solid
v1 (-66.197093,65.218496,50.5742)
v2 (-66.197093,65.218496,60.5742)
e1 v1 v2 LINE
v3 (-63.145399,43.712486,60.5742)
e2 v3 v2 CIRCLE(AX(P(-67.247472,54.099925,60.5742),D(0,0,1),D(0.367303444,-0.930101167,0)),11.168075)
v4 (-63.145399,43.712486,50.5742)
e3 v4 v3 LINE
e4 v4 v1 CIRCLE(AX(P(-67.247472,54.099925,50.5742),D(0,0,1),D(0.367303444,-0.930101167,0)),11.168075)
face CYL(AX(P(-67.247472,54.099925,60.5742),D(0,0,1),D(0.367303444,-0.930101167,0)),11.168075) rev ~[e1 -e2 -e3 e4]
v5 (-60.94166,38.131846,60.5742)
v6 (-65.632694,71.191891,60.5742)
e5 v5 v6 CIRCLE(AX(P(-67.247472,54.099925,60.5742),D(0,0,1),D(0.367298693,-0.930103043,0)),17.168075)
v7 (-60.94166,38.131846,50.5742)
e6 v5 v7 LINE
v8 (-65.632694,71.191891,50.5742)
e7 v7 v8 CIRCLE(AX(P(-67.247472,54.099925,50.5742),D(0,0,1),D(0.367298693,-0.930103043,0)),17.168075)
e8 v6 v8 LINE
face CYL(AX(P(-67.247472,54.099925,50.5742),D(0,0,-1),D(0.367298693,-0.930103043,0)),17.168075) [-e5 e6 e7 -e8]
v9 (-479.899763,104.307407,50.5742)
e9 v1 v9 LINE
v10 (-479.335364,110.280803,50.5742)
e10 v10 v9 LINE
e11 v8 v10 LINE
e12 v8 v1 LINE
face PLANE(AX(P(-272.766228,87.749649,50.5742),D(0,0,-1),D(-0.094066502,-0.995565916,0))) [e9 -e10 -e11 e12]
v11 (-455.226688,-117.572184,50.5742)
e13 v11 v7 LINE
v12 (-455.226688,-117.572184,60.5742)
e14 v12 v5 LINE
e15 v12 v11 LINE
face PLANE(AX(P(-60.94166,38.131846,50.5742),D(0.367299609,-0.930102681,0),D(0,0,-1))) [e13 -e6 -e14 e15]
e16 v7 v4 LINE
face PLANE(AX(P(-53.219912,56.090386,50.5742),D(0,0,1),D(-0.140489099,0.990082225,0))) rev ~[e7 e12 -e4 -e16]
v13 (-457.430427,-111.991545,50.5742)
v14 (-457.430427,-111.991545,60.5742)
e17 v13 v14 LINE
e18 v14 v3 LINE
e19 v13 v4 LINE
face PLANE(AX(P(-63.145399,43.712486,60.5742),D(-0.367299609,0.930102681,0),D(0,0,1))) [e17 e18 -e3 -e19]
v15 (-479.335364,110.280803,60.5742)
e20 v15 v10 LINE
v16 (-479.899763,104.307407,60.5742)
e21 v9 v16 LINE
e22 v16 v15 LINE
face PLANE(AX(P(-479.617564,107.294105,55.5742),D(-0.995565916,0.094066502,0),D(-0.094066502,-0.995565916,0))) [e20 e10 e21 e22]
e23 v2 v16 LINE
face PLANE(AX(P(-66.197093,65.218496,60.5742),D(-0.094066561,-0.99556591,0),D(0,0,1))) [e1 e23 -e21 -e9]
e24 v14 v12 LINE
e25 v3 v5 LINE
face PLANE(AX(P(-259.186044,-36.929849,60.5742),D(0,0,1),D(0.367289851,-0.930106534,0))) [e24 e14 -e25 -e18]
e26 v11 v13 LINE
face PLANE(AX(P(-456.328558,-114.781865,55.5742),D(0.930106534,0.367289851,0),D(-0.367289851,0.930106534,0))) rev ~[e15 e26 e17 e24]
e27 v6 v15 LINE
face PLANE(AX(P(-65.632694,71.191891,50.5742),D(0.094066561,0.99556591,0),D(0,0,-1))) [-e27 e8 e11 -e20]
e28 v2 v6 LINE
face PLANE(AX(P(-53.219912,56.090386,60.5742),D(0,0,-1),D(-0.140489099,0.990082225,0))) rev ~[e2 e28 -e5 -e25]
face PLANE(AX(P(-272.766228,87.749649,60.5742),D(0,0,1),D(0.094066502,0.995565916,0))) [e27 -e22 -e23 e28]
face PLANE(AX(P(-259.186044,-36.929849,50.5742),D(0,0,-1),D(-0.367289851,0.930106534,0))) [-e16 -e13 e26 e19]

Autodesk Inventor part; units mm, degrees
ref_plane "YZ Plane" through (0, 0, 0) normal (1, 0, 0) x (0, 1, 0)
ref_plane "XZ Plane" through (0, 0, 0) normal (0, 1, 0) x (-1, 0, 0)
ref_plane "XY Plane" through (0, 0, 0) normal (0, 0, 1) x (1, 0, 0)
ref_plane "Work Plane1" through (-50.9507, 50.6889, 57.5) normal (0, 0, 1) x (-0.2048689, -0.9787894, 0)
sketch "Sketch1" plane through (-50.9507, 50.6889, 57.5) normal (0, 0, 1) x (-0.2048689, -0.9787894, 0)
  arc A0 (13.9049, -7.4915) -> (-16.5454, -18.513) centre (0, -16.65) ccw
  circle A1 centre (79.9079, -408.7425) radius 3.175 projected
  circle A2 centre (121.7651, -356.8432) radius 3.175 projected
  circle A3 centre (187.6397, -367.1429) radius 3.175 projected
  circle A4 centre (211.6572, -429.3419) radius 3.175 projected
  circle A5 centre (169.8001, -481.2412) radius 3.175 projected
  circle A6 centre (103.9254, -470.9415) radius 3.175 projected
  circle A7 centre (66.2341, -383.8137) radius 9.5 projected
  circle A8 centre (136.5171, -332.537) radius 9.5 projected
  circle A9 centre (216.0656, -367.7655) radius 9.5 projected
  circle A10 centre (225.331, -454.2707) radius 9.5 projected
  circle A11 centre (155.048, -505.5474) radius 9.5 projected
  circle A12 centre (75.4996, -470.3189) radius 9.5 projected
  circle A13 centre (59.2774, -428.3076) radius 9.5 projected
  circle A14 centre (110.5541, -498.5906) radius 9.5 projected
  circle A15 centre (197.0593, -489.3252) radius 9.5 projected
  circle A16 centre (232.2878, -409.7768) radius 9.5 projected
  circle A17 centre (181.0111, -339.4938) radius 9.5 projected
  circle A18 centre (94.5059, -348.7592) radius 9.5 projected
  circle A19 centre (145.7826, -419.0422) radius 58 projected
  arc A20 (29.4913, -426.0124) -> (29.2993, -421.0163) centre (29.3729, -423.5152) ccw projected
  arc A21 (29.4913, -426.0124) -> (29.7056, -428.9608) centre (145.7826, -419.0422) ccw projected
  arc A22 (30.238, -433.9322) -> (29.7056, -428.9608) centre (29.9496, -431.4489) ccw projected
  arc A23 (30.238, -433.9322) -> (30.653, -436.8591) centre (145.7826, -419.0422) ccw projected
  arc A24 (31.5235, -441.7825) -> (30.653, -436.8591) centre (31.0663, -439.3247) ccw projected
  arc A25 (31.5235, -441.7825) -> (32.1373, -444.6743) centre (145.7826, -419.0422) ccw projected
  arc A26 (33.3417, -449.5268) -> (32.1373, -444.6743) centre (32.7178, -447.1059) ccw projected
  arc A27 (33.3417, -449.5268) -> (34.1514, -452.3699) centre (145.7826, -419.0422) ccw projected
  arc A28 (35.6842, -457.129) -> (34.1514, -452.3699) centre (34.8965, -454.7563) ccw projected
  arc A29 (35.6842, -457.129) -> (36.686, -459.9102) centre (145.7826, -419.0422) ccw projected
  arc A30 (38.54, -464.5536) -> (36.686, -459.9102) centre (37.5922, -462.2402) ccw projected
  arc A31 (38.54, -464.5536) -> (39.7293, -467.26) centre (145.7826, -419.0422) ccw projected
  arc A32 (41.8958, -471.766) -> (39.7293, -467.26) centre (40.7924, -469.5227) ccw projected
  arc A33 (41.8958, -471.766) -> (43.267, -474.3849) centre (145.7826, -419.0422) ccw projected
  arc A34 (45.736, -478.7325) -> (43.267, -474.3849) centre (44.4821, -476.5698) ccw projected
  arc A35 (45.736, -478.7325) -> (47.2827, -481.2518) centre (145.7826, -419.0422) ccw projected
  arc A36 (50.0427, -485.4208) -> (47.2827, -481.2518) centre (48.644, -483.3486) ccw projected
  arc A37 (50.0427, -485.4208) -> (51.7577, -487.8286) centre (145.7826, -419.0422) ccw projected
  arc A38 (54.7957, -491.7996) -> (51.7577, -487.8286) centre (53.2589, -489.8277) ccw projected
  arc A39 (54.7957, -491.7996) -> (56.671, -494.0847) centre (145.7826, -419.0422) ccw projected
  arc A40 (59.9729, -497.8391) -> (56.671, -494.0847) centre (58.3052, -495.9767) ccw projected
  arc A41 (59.9729, -497.8391) -> (61.9999, -499.991) centre (145.7826, -419.0422) ccw projected
  arc A42 (65.5503, -503.5113) -> (61.9999, -499.991) centre (63.7593, -501.767) ccw projected
  arc A43 (65.5503, -503.5113) -> (67.7193, -505.5198) centre (145.7826, -419.0422) ccw projected
  arc A44 (71.5017, -508.7896) -> (67.7193, -505.5198) centre (69.5959, -507.1716) ccw projected
  arc A45 (71.5017, -508.7896) -> (73.8027, -510.6454) centre (145.7826, -419.0422) ccw projected
  arc A46 (77.7994, -513.6495) -> (73.8027, -510.6454) centre (75.7876, -512.1654) ccw projected
  arc A47 (77.7994, -513.6495) -> (80.2218, -515.344) centre (145.7826, -419.0422) ccw projected
  arc A48 (84.4141, -518.0683) -> (80.2218, -515.344) centre (82.3058, -516.7249) ccw projected
  arc A49 (84.4141, -518.0683) -> (86.9465, -519.5935) centre (145.7826, -419.0422) ccw projected
  arc A50 (91.315, -522.0254) -> (86.9465, -519.5935) centre (89.1198, -520.829) ccw projected
  arc A51 (91.315, -522.0254) -> (93.9455, -523.3742) centre (145.7826, -419.0422) ccw projected
  arc A52 (98.4698, -525.5023) -> (93.9455, -523.3742) centre (96.1981, -524.4585) ccw projected
  arc A53 (98.4698, -525.5023) -> (101.1862, -526.6685) centre (145.7826, -419.0422) ccw projected
  arc A54 (105.8452, -528.4828) -> (101.1862, -526.6685) centre (103.5076, -527.5965) ccw projected
  arc A55 (105.8452, -528.4828) -> (108.6348, -529.4609) centre (145.7826, -419.0422) ccw projected
  arc A56 (113.4068, -530.9531) -> (108.6348, -529.4609) centre (111.0141, -530.2284) ccw projected
  arc A57 (113.4068, -530.9531) -> (116.2567, -531.7386) centre (145.7826, -419.0422) ccw projected
  arc A58 (121.1193, -532.9016) -> (116.2567, -531.7386) centre (118.6828, -532.3419) ccw projected
  arc A59 (121.1193, -532.9016) -> (124.0162, -533.4908) centre (145.7826, -419.0422) ccw projected
  arc A60 (128.9469, -534.3193) -> (124.0162, -533.4908) centre (126.4778, -533.9271) ccw projected
  arc A61 (128.9469, -534.3193) -> (131.8772, -534.7093) centre (145.7826, -419.0422) ccw projected
  arc A62 (136.8529, -535.1995) -> (131.8772, -534.7093) centre (134.3628, -534.9767) ccw projected
  arc A63 (136.8529, -535.1995) -> (139.803, -535.3886) centre (145.7826, -419.0422) ccw projected
  arc A64 (144.8006, -535.5381) -> (139.803, -535.3886) centre (142.3011, -535.4857) ccw projected
  arc A65 (144.8006, -535.5381) -> (147.7567, -535.5255) centre (145.7826, -419.0422) ccw projected
  arc A66 (152.7528, -535.3335) -> (147.7567, -535.5255) centre (150.2556, -535.4518) ccw projected
  arc A67 (152.7528, -535.3335) -> (155.7012, -535.1192) centre (145.7826, -419.0422) ccw projected
  arc A68 (160.6726, -534.5867) -> (155.7012, -535.1192) centre (158.1893, -534.8752) ccw projected
  arc A69 (160.6726, -534.5867) -> (163.5995, -534.1717) centre (145.7826, -419.0422) ccw projected
  arc A70 (168.5229, -533.3012) -> (163.5995, -534.1717) centre (166.0651, -533.7585) ccw projected
  arc A71 (168.5229, -533.3012) -> (171.4146, -532.6875) centre (145.7826, -419.0422) ccw projected
  arc A72 (176.2672, -531.483) -> (171.4146, -532.6875) centre (173.8463, -532.107) ccw projected
  arc A73 (176.2672, -531.483) -> (179.1103, -530.6733) centre (145.7826, -419.0422) ccw projected
  arc A74 (183.8694, -529.1405) -> (179.1103, -530.6733) centre (181.4967, -529.9282) ccw projected
  arc A75 (183.8694, -529.1405) -> (186.6506, -528.1387) centre (145.7826, -419.0422) ccw projected
  arc A76 (191.2939, -526.2847) -> (186.6506, -528.1387) centre (188.9806, -527.2325) ccw projected
  arc A77 (191.2939, -526.2847) -> (194.0003, -525.0955) centre (145.7826, -419.0422) ccw projected
  arc A78 (198.5063, -522.9289) -> (194.0003, -525.0955) centre (196.263, -524.0324) ccw projected
  arc A79 (198.5063, -522.9289) -> (201.1253, -521.5577) centre (145.7826, -419.0422) ccw projected
  arc A80 (205.4729, -519.0888) -> (201.1253, -521.5577) centre (203.3101, -520.3427) ccw projected
  arc A81 (205.4729, -519.0888) -> (207.9921, -517.542) centre (145.7826, -419.0422) ccw projected
  arc A82 (212.1612, -514.7821) -> (207.9921, -517.542) centre (210.089, -516.1807) ccw projected
  arc A83 (212.1612, -514.7821) -> (214.569, -513.0671) centre (145.7826, -419.0422) ccw projected
  arc A84 (218.54, -510.0291) -> (214.569, -513.0671) centre (216.5681, -511.5658) ccw projected
  arc A85 (218.54, -510.0291) -> (220.8251, -508.1537) centre (145.7826, -419.0422) ccw projected
  arc A86 (224.5795, -504.8518) -> (220.8251, -508.1537) centre (222.7171, -506.5196) ccw projected
  arc A87 (224.5795, -504.8518) -> (226.7314, -502.8249) centre (145.7826, -419.0422) ccw projected
  arc A88 (230.2517, -499.2745) -> (226.7314, -502.8249) centre (228.5074, -501.0655) ccw projected
  arc A89 (230.2517, -499.2745) -> (232.2602, -497.1055) centre (145.7826, -419.0422) ccw projected
  arc A90 (235.53, -493.3231) -> (232.2602, -497.1055) centre (233.912, -495.2289) ccw projected
  arc A91 (235.53, -493.3231) -> (237.3858, -491.022) centre (145.7826, -419.0422) ccw projected
  arc A92 (240.3899, -487.0253) -> (237.3858, -491.022) centre (238.9057, -489.0371) ccw projected
  arc A93 (240.3899, -487.0253) -> (242.0843, -484.603) centre (145.7826, -419.0422) ccw projected
  arc A94 (244.8087, -480.4106) -> (242.0843, -484.603) centre (243.4653, -482.519) ccw projected
  arc A95 (244.8087, -480.4106) -> (246.3339, -477.8783) centre (145.7826, -419.0422) ccw projected
  arc A96 (248.7657, -473.5098) -> (246.3339, -477.8783) centre (247.5693, -475.7049) ccw projected
  arc A97 (248.7657, -473.5098) -> (250.1146, -470.8793) centre (145.7826, -419.0422) ccw projected
  arc A98 (252.2427, -466.355) -> (250.1146, -470.8793) centre (251.1989, -468.6266) ccw projected
  arc A99 (252.2427, -466.355) -> (253.4088, -463.6386) centre (145.7826, -419.0422) ccw projected
  arc A100 (255.2232, -458.9796) -> (253.4088, -463.6386) centre (254.3369, -461.3172) ccw projected
  arc A101 (255.2232, -458.9796) -> (256.2013, -456.1899) centre (145.7826, -419.0422) ccw projected
  arc A102 (257.6935, -451.418) -> (256.2013, -456.1899) centre (256.9688, -453.8106) ccw projected
  arc A103 (257.6935, -451.418) -> (258.4789, -448.5681) centre (145.7826, -419.0422) ccw projected
  arc A104 (259.642, -443.7054) -> (258.4789, -448.5681) centre (259.0822, -446.142) ccw projected
  arc A105 (259.642, -443.7054) -> (260.2311, -440.8086) centre (145.7826, -419.0422) ccw projected
  arc A106 (261.0597, -435.8779) -> (260.2311, -440.8086) centre (260.6675, -438.3469) ccw projected
  arc A107 (261.0597, -435.8779) -> (261.4497, -432.9476) centre (145.7826, -419.0422) ccw projected
  arc A108 (261.9398, -427.9719) -> (261.4497, -432.9476) centre (261.717, -430.4619) ccw projected
  arc A109 (261.9398, -427.9719) -> (262.129, -425.0218) centre (145.7826, -419.0422) ccw projected
  arc A110 (262.2784, -420.0242) -> (262.129, -425.0218) centre (262.2261, -422.5236) ccw projected
  arc A111 (262.2784, -420.0242) -> (262.2658, -417.0681) centre (145.7826, -419.0422) ccw projected
  arc A112 (262.0739, -412.0719) -> (262.2658, -417.0681) centre (262.1922, -414.5691) ccw projected
  arc A113 (262.0739, -412.0719) -> (261.8596, -409.1236) centre (145.7826, -419.0422) ccw projected
  arc A114 (261.3271, -404.1522) -> (261.8596, -409.1236) centre (261.6156, -406.6355) ccw projected
  arc A115 (261.3271, -404.1522) -> (260.9121, -401.2253) centre (145.7826, -419.0422) ccw projected
  arc A116 (260.0416, -396.3019) -> (260.9121, -401.2253) centre (260.4989, -398.7597) ccw projected
  arc A117 (260.0416, -396.3019) -> (259.4278, -393.4101) centre (145.7826, -419.0422) ccw projected
  arc A118 (258.2234, -388.5576) -> (259.4278, -393.4101) centre (258.8473, -390.9785) ccw projected
  arc A119 (258.2234, -388.5576) -> (257.4137, -385.7145) centre (145.7826, -419.0422) ccw projected
  arc A120 (255.8809, -380.9554) -> (257.4137, -385.7145) centre (256.6686, -383.3281) ccw projected
  arc A121 (255.8809, -380.9554) -> (254.8791, -378.1742) centre (145.7826, -419.0422) ccw projected
  arc A122 (253.0251, -373.5308) -> (254.8791, -378.1742) centre (253.9729, -375.8442) ccw projected
  arc A123 (253.0251, -373.5308) -> (251.8358, -370.8244) centre (145.7826, -419.0422) ccw projected
  arc A124 (249.6693, -366.3184) -> (251.8358, -370.8244) centre (250.7727, -368.5617) ccw projected
  arc A125 (249.6693, -366.3184) -> (248.2981, -363.6995) centre (145.7826, -419.0422) ccw projected
  arc A126 (245.8291, -359.3519) -> (248.2981, -363.6995) centre (247.0831, -361.5146) ccw projected
  arc A127 (245.8291, -359.3519) -> (244.2824, -356.8326) centre (145.7826, -419.0422) ccw projected
  arc A128 (241.5225, -352.6636) -> (244.2824, -356.8326) centre (242.9211, -354.7358) ccw projected
  arc A129 (241.5225, -352.6636) -> (239.8075, -350.2558) centre (145.7826, -419.0422) ccw projected
  arc A130 (236.7695, -346.2848) -> (239.8075, -350.2558) centre (238.3062, -348.2567) ccw projected
  arc A131 (236.7695, -346.2848) -> (234.8941, -343.9996) centre (145.7826, -419.0422) ccw projected
  arc A132 (231.5922, -340.2453) -> (234.8941, -343.9996) centre (233.26, -342.1077) ccw projected
  arc A133 (231.5922, -340.2453) -> (229.5653, -338.0934) centre (145.7826, -419.0422) ccw projected
  arc A134 (226.0149, -334.5731) -> (229.5653, -338.0934) centre (227.8058, -336.3174) ccw projected
  arc A135 (226.0149, -334.5731) -> (223.8458, -332.5646) centre (145.7826, -419.0422) ccw projected
  arc A136 (220.0635, -329.2948) -> (223.8458, -332.5646) centre (221.9693, -330.9127) ccw projected
  arc A137 (220.0635, -329.2948) -> (217.7624, -327.439) centre (145.7826, -419.0422) ccw projected
  arc A138 (213.7657, -324.4349) -> (217.7624, -327.439) centre (215.7775, -325.919) ccw projected
  arc A139 (213.7657, -324.4349) -> (211.3434, -322.7404) centre (145.7826, -419.0422) ccw projected
  arc A140 (207.151, -320.0161) -> (211.3434, -322.7404) centre (209.2594, -321.3595) ccw projected
  arc A141 (207.151, -320.0161) -> (204.6187, -318.4909) centre (145.7826, -419.0422) ccw projected
  arc A142 (200.2501, -316.059) -> (204.6187, -318.4909) centre (202.4453, -317.2554) ccw projected
  arc A143 (200.2501, -316.059) -> (197.6196, -314.7102) centre (145.7826, -419.0422) ccw projected
  arc A144 (193.0953, -312.5821) -> (197.6196, -314.7102) centre (195.367, -313.6259) ccw projected
  arc A145 (193.0953, -312.5821) -> (190.3789, -311.4159) centre (145.7826, -419.0422) ccw projected
  arc A146 (185.72, -309.6015) -> (190.3789, -311.4159) centre (188.0576, -310.4879) ccw projected
  arc A147 (185.72, -309.6015) -> (182.9303, -308.6235) centre (145.7826, -419.0422) ccw projected
  arc A148 (178.1584, -307.1313) -> (182.9303, -308.6235) centre (180.551, -307.856) ccw projected
  arc A149 (178.1584, -307.1313) -> (175.3085, -306.3458) centre (145.7826, -419.0422) ccw projected
  arc A150 (170.4458, -305.1827) -> (175.3085, -306.3458) centre (172.8823, -305.7425) ccw projected
  arc A151 (170.4458, -305.1827) -> (167.5489, -304.5936) centre (145.7826, -419.0422) ccw projected
  arc A152 (162.6183, -303.7651) -> (167.5489, -304.5936) centre (165.0873, -304.1573) ccw projected
  arc A153 (162.6183, -303.7651) -> (159.688, -303.375) centre (145.7826, -419.0422) ccw projected
  arc A154 (154.7122, -302.8849) -> (159.688, -303.375) centre (157.2023, -303.1077) ccw projected
  arc A155 (154.7122, -302.8849) -> (151.7621, -302.6958) centre (145.7826, -419.0422) ccw projected
  arc A156 (146.7646, -302.5463) -> (151.7621, -302.6958) centre (149.264, -302.5987) ccw projected
  arc A157 (146.7646, -302.5463) -> (143.8084, -302.5589) centre (145.7826, -419.0422) ccw projected
  arc A158 (138.8123, -302.7509) -> (143.8084, -302.5589) centre (141.3095, -302.6326) ccw projected
  arc A159 (138.8123, -302.7509) -> (135.8639, -302.9652) centre (145.7826, -419.0422) ccw projected
  arc A160 (130.8926, -303.4977) -> (135.8639, -302.9652) centre (133.3759, -303.2092) ccw projected
  arc A161 (130.8926, -303.4977) -> (127.9657, -303.9127) centre (145.7826, -419.0422) ccw projected
  arc A162 (123.0422, -304.7832) -> (127.9657, -303.9127) centre (125.5001, -304.3259) ccw projected
  arc A163 (123.0422, -304.7832) -> (120.1505, -305.3969) centre (145.7826, -419.0422) ccw projected
  arc A164 (115.2979, -306.6014) -> (120.1505, -305.3969) centre (117.7188, -305.9774) ccw projected
  arc A165 (115.2979, -306.6014) -> (112.4548, -307.4111) centre (145.7826, -419.0422) ccw projected
  arc A166 (107.6958, -308.9438) -> (112.4548, -307.4111) centre (110.0684, -308.1562) ccw projected
  arc A167 (107.6958, -308.9438) -> (104.9145, -309.9457) centre (145.7826, -419.0422) ccw projected
  arc A168 (100.2712, -311.7996) -> (104.9145, -309.9457) centre (102.5846, -310.8519) ccw projected
  arc A169 (100.2712, -311.7996) -> (97.5648, -312.9889) centre (145.7826, -419.0422) ccw projected
  arc A170 (93.0588, -315.1555) -> (97.5648, -312.9889) centre (95.3021, -314.052) ccw projected
  arc A171 (93.0588, -315.1555) -> (90.4399, -316.5266) centre (145.7826, -419.0422) ccw projected
  arc A172 (86.0922, -318.9956) -> (90.4399, -316.5266) centre (88.255, -317.7417) ccw projected
  arc A173 (86.0922, -318.9956) -> (83.573, -320.5424) centre (145.7826, -419.0422) ccw projected
  arc A174 (79.404, -323.3023) -> (83.573, -320.5424) centre (81.4761, -321.9037) ccw projected
  arc A175 (79.404, -323.3023) -> (76.9961, -325.0173) centre (145.7826, -419.0422) ccw projected
  arc A176 (73.0252, -328.0553) -> (76.9961, -325.0173) centre (74.9971, -326.5185) ccw projected
  arc A177 (73.0252, -328.0553) -> (70.74, -329.9307) centre (145.7826, -419.0422) ccw projected
  arc A178 (66.9856, -333.2326) -> (70.74, -329.9307) centre (68.8481, -331.5648) ccw projected
  arc A179 (66.9856, -333.2326) -> (64.8338, -335.2595) centre (145.7826, -419.0422) ccw projected
  arc A180 (61.3135, -338.8099) -> (64.8338, -335.2595) centre (63.0577, -337.0189) ccw projected
  arc A181 (61.3135, -338.8099) -> (59.305, -340.9789) centre (145.7826, -419.0422) ccw projected
  arc A182 (56.0351, -344.7613) -> (59.305, -340.9789) centre (57.6531, -342.8555) ccw projected
  arc A183 (56.0351, -344.7613) -> (54.1793, -347.0624) centre (145.7826, -419.0422) ccw projected
  arc A184 (51.1753, -351.0591) -> (54.1793, -347.0624) centre (52.6594, -349.0473) ccw projected
  arc A185 (51.1753, -351.0591) -> (49.4808, -353.4814) centre (145.7826, -419.0422) ccw projected
  arc A186 (46.7565, -357.6738) -> (49.4808, -353.4814) centre (48.0999, -355.5654) ccw projected
  arc A187 (46.7565, -357.6738) -> (45.2313, -360.2061) centre (145.7826, -419.0422) ccw projected
  arc A188 (42.7994, -364.5746) -> (45.2313, -360.2061) centre (43.9958, -362.3795) ccw projected
  arc A189 (42.7994, -364.5746) -> (41.4506, -367.2051) centre (145.7826, -419.0422) ccw projected
  arc A190 (39.3225, -371.7294) -> (41.4506, -367.2051) centre (40.3663, -369.4577) ccw projected
  arc A191 (39.3225, -371.7294) -> (38.1563, -374.4458) centre (145.7826, -419.0422) ccw projected
  arc A192 (36.3419, -379.1048) -> (38.1563, -374.4458) centre (37.2283, -376.7672) ccw projected
  arc A193 (36.3419, -379.1048) -> (35.3638, -381.8945) centre (145.7826, -419.0422) ccw projected
  arc A194 (33.8716, -386.6664) -> (35.3638, -381.8945) centre (34.5964, -384.2738) ccw projected
  arc A195 (33.8716, -386.6664) -> (33.0862, -389.5163) centre (145.7826, -419.0422) ccw projected
  arc A196 (31.9231, -394.3789) -> (33.0862, -389.5163) centre (32.4829, -391.9424) ccw projected
  arc A197 (31.9231, -394.3789) -> (31.334, -397.2758) centre (145.7826, -419.0422) ccw projected
  arc A198 (30.5055, -402.2065) -> (31.334, -397.2758) centre (30.8977, -399.7374) ccw projected
  arc A199 (30.5055, -402.2065) -> (30.1154, -405.1368) centre (145.7826, -419.0422) ccw projected
  arc A200 (29.6253, -410.1125) -> (30.1154, -405.1368) centre (29.8481, -407.6225) ccw projected
  arc A201 (29.6253, -410.1125) -> (29.4361, -413.0626) centre (145.7826, -419.0422) ccw projected
  arc A202 (29.2867, -418.0602) -> (29.4361, -413.0626) centre (29.3391, -415.5607) ccw projected
  arc A203 (29.2867, -418.0602) -> (29.2993, -421.0163) centre (145.7826, -419.0422) ccw projected
  line L0 (-16.5454, -18.513) -> (29.9496, -431.4489)
  line L1 (13.9049, -7.4915) -> (247.0831, -361.5146)
  point P0 (39.1755, 60.2546)
ref_plane "Work Plane2" through (-479.3841, 109.765, 57.5) normal (-0.9955659, 0.0940665, 0) x (-0.0940665, -0.9955659, 0)
sketch "Sketch2" plane through (-479.3841, 109.765, 57.5) normal (-0.9955659, 0.0940665, 0) x (-0.0940665, -0.9955659, 0)
  line L0 (-0.5181, 3.0742) -> (5.4819, 3.0742)
  line L1 (5.4819, 3.0742) -> (5.4819, -6.9258)
  line L2 (5.4819, -6.9258) -> (-0.5181, -6.9258)
  line L3 (-0.5181, -6.9258) -> (-0.5181, 3.0742)
  point P0 (64.1843, -57.5)
  dimension "d2" = 10
  dimension "d3" = 6
sweep "Sweep1" add profiles "Sketch2" path "Sketch1" path curves L0 A0 L1
properties part number "cadena2"
